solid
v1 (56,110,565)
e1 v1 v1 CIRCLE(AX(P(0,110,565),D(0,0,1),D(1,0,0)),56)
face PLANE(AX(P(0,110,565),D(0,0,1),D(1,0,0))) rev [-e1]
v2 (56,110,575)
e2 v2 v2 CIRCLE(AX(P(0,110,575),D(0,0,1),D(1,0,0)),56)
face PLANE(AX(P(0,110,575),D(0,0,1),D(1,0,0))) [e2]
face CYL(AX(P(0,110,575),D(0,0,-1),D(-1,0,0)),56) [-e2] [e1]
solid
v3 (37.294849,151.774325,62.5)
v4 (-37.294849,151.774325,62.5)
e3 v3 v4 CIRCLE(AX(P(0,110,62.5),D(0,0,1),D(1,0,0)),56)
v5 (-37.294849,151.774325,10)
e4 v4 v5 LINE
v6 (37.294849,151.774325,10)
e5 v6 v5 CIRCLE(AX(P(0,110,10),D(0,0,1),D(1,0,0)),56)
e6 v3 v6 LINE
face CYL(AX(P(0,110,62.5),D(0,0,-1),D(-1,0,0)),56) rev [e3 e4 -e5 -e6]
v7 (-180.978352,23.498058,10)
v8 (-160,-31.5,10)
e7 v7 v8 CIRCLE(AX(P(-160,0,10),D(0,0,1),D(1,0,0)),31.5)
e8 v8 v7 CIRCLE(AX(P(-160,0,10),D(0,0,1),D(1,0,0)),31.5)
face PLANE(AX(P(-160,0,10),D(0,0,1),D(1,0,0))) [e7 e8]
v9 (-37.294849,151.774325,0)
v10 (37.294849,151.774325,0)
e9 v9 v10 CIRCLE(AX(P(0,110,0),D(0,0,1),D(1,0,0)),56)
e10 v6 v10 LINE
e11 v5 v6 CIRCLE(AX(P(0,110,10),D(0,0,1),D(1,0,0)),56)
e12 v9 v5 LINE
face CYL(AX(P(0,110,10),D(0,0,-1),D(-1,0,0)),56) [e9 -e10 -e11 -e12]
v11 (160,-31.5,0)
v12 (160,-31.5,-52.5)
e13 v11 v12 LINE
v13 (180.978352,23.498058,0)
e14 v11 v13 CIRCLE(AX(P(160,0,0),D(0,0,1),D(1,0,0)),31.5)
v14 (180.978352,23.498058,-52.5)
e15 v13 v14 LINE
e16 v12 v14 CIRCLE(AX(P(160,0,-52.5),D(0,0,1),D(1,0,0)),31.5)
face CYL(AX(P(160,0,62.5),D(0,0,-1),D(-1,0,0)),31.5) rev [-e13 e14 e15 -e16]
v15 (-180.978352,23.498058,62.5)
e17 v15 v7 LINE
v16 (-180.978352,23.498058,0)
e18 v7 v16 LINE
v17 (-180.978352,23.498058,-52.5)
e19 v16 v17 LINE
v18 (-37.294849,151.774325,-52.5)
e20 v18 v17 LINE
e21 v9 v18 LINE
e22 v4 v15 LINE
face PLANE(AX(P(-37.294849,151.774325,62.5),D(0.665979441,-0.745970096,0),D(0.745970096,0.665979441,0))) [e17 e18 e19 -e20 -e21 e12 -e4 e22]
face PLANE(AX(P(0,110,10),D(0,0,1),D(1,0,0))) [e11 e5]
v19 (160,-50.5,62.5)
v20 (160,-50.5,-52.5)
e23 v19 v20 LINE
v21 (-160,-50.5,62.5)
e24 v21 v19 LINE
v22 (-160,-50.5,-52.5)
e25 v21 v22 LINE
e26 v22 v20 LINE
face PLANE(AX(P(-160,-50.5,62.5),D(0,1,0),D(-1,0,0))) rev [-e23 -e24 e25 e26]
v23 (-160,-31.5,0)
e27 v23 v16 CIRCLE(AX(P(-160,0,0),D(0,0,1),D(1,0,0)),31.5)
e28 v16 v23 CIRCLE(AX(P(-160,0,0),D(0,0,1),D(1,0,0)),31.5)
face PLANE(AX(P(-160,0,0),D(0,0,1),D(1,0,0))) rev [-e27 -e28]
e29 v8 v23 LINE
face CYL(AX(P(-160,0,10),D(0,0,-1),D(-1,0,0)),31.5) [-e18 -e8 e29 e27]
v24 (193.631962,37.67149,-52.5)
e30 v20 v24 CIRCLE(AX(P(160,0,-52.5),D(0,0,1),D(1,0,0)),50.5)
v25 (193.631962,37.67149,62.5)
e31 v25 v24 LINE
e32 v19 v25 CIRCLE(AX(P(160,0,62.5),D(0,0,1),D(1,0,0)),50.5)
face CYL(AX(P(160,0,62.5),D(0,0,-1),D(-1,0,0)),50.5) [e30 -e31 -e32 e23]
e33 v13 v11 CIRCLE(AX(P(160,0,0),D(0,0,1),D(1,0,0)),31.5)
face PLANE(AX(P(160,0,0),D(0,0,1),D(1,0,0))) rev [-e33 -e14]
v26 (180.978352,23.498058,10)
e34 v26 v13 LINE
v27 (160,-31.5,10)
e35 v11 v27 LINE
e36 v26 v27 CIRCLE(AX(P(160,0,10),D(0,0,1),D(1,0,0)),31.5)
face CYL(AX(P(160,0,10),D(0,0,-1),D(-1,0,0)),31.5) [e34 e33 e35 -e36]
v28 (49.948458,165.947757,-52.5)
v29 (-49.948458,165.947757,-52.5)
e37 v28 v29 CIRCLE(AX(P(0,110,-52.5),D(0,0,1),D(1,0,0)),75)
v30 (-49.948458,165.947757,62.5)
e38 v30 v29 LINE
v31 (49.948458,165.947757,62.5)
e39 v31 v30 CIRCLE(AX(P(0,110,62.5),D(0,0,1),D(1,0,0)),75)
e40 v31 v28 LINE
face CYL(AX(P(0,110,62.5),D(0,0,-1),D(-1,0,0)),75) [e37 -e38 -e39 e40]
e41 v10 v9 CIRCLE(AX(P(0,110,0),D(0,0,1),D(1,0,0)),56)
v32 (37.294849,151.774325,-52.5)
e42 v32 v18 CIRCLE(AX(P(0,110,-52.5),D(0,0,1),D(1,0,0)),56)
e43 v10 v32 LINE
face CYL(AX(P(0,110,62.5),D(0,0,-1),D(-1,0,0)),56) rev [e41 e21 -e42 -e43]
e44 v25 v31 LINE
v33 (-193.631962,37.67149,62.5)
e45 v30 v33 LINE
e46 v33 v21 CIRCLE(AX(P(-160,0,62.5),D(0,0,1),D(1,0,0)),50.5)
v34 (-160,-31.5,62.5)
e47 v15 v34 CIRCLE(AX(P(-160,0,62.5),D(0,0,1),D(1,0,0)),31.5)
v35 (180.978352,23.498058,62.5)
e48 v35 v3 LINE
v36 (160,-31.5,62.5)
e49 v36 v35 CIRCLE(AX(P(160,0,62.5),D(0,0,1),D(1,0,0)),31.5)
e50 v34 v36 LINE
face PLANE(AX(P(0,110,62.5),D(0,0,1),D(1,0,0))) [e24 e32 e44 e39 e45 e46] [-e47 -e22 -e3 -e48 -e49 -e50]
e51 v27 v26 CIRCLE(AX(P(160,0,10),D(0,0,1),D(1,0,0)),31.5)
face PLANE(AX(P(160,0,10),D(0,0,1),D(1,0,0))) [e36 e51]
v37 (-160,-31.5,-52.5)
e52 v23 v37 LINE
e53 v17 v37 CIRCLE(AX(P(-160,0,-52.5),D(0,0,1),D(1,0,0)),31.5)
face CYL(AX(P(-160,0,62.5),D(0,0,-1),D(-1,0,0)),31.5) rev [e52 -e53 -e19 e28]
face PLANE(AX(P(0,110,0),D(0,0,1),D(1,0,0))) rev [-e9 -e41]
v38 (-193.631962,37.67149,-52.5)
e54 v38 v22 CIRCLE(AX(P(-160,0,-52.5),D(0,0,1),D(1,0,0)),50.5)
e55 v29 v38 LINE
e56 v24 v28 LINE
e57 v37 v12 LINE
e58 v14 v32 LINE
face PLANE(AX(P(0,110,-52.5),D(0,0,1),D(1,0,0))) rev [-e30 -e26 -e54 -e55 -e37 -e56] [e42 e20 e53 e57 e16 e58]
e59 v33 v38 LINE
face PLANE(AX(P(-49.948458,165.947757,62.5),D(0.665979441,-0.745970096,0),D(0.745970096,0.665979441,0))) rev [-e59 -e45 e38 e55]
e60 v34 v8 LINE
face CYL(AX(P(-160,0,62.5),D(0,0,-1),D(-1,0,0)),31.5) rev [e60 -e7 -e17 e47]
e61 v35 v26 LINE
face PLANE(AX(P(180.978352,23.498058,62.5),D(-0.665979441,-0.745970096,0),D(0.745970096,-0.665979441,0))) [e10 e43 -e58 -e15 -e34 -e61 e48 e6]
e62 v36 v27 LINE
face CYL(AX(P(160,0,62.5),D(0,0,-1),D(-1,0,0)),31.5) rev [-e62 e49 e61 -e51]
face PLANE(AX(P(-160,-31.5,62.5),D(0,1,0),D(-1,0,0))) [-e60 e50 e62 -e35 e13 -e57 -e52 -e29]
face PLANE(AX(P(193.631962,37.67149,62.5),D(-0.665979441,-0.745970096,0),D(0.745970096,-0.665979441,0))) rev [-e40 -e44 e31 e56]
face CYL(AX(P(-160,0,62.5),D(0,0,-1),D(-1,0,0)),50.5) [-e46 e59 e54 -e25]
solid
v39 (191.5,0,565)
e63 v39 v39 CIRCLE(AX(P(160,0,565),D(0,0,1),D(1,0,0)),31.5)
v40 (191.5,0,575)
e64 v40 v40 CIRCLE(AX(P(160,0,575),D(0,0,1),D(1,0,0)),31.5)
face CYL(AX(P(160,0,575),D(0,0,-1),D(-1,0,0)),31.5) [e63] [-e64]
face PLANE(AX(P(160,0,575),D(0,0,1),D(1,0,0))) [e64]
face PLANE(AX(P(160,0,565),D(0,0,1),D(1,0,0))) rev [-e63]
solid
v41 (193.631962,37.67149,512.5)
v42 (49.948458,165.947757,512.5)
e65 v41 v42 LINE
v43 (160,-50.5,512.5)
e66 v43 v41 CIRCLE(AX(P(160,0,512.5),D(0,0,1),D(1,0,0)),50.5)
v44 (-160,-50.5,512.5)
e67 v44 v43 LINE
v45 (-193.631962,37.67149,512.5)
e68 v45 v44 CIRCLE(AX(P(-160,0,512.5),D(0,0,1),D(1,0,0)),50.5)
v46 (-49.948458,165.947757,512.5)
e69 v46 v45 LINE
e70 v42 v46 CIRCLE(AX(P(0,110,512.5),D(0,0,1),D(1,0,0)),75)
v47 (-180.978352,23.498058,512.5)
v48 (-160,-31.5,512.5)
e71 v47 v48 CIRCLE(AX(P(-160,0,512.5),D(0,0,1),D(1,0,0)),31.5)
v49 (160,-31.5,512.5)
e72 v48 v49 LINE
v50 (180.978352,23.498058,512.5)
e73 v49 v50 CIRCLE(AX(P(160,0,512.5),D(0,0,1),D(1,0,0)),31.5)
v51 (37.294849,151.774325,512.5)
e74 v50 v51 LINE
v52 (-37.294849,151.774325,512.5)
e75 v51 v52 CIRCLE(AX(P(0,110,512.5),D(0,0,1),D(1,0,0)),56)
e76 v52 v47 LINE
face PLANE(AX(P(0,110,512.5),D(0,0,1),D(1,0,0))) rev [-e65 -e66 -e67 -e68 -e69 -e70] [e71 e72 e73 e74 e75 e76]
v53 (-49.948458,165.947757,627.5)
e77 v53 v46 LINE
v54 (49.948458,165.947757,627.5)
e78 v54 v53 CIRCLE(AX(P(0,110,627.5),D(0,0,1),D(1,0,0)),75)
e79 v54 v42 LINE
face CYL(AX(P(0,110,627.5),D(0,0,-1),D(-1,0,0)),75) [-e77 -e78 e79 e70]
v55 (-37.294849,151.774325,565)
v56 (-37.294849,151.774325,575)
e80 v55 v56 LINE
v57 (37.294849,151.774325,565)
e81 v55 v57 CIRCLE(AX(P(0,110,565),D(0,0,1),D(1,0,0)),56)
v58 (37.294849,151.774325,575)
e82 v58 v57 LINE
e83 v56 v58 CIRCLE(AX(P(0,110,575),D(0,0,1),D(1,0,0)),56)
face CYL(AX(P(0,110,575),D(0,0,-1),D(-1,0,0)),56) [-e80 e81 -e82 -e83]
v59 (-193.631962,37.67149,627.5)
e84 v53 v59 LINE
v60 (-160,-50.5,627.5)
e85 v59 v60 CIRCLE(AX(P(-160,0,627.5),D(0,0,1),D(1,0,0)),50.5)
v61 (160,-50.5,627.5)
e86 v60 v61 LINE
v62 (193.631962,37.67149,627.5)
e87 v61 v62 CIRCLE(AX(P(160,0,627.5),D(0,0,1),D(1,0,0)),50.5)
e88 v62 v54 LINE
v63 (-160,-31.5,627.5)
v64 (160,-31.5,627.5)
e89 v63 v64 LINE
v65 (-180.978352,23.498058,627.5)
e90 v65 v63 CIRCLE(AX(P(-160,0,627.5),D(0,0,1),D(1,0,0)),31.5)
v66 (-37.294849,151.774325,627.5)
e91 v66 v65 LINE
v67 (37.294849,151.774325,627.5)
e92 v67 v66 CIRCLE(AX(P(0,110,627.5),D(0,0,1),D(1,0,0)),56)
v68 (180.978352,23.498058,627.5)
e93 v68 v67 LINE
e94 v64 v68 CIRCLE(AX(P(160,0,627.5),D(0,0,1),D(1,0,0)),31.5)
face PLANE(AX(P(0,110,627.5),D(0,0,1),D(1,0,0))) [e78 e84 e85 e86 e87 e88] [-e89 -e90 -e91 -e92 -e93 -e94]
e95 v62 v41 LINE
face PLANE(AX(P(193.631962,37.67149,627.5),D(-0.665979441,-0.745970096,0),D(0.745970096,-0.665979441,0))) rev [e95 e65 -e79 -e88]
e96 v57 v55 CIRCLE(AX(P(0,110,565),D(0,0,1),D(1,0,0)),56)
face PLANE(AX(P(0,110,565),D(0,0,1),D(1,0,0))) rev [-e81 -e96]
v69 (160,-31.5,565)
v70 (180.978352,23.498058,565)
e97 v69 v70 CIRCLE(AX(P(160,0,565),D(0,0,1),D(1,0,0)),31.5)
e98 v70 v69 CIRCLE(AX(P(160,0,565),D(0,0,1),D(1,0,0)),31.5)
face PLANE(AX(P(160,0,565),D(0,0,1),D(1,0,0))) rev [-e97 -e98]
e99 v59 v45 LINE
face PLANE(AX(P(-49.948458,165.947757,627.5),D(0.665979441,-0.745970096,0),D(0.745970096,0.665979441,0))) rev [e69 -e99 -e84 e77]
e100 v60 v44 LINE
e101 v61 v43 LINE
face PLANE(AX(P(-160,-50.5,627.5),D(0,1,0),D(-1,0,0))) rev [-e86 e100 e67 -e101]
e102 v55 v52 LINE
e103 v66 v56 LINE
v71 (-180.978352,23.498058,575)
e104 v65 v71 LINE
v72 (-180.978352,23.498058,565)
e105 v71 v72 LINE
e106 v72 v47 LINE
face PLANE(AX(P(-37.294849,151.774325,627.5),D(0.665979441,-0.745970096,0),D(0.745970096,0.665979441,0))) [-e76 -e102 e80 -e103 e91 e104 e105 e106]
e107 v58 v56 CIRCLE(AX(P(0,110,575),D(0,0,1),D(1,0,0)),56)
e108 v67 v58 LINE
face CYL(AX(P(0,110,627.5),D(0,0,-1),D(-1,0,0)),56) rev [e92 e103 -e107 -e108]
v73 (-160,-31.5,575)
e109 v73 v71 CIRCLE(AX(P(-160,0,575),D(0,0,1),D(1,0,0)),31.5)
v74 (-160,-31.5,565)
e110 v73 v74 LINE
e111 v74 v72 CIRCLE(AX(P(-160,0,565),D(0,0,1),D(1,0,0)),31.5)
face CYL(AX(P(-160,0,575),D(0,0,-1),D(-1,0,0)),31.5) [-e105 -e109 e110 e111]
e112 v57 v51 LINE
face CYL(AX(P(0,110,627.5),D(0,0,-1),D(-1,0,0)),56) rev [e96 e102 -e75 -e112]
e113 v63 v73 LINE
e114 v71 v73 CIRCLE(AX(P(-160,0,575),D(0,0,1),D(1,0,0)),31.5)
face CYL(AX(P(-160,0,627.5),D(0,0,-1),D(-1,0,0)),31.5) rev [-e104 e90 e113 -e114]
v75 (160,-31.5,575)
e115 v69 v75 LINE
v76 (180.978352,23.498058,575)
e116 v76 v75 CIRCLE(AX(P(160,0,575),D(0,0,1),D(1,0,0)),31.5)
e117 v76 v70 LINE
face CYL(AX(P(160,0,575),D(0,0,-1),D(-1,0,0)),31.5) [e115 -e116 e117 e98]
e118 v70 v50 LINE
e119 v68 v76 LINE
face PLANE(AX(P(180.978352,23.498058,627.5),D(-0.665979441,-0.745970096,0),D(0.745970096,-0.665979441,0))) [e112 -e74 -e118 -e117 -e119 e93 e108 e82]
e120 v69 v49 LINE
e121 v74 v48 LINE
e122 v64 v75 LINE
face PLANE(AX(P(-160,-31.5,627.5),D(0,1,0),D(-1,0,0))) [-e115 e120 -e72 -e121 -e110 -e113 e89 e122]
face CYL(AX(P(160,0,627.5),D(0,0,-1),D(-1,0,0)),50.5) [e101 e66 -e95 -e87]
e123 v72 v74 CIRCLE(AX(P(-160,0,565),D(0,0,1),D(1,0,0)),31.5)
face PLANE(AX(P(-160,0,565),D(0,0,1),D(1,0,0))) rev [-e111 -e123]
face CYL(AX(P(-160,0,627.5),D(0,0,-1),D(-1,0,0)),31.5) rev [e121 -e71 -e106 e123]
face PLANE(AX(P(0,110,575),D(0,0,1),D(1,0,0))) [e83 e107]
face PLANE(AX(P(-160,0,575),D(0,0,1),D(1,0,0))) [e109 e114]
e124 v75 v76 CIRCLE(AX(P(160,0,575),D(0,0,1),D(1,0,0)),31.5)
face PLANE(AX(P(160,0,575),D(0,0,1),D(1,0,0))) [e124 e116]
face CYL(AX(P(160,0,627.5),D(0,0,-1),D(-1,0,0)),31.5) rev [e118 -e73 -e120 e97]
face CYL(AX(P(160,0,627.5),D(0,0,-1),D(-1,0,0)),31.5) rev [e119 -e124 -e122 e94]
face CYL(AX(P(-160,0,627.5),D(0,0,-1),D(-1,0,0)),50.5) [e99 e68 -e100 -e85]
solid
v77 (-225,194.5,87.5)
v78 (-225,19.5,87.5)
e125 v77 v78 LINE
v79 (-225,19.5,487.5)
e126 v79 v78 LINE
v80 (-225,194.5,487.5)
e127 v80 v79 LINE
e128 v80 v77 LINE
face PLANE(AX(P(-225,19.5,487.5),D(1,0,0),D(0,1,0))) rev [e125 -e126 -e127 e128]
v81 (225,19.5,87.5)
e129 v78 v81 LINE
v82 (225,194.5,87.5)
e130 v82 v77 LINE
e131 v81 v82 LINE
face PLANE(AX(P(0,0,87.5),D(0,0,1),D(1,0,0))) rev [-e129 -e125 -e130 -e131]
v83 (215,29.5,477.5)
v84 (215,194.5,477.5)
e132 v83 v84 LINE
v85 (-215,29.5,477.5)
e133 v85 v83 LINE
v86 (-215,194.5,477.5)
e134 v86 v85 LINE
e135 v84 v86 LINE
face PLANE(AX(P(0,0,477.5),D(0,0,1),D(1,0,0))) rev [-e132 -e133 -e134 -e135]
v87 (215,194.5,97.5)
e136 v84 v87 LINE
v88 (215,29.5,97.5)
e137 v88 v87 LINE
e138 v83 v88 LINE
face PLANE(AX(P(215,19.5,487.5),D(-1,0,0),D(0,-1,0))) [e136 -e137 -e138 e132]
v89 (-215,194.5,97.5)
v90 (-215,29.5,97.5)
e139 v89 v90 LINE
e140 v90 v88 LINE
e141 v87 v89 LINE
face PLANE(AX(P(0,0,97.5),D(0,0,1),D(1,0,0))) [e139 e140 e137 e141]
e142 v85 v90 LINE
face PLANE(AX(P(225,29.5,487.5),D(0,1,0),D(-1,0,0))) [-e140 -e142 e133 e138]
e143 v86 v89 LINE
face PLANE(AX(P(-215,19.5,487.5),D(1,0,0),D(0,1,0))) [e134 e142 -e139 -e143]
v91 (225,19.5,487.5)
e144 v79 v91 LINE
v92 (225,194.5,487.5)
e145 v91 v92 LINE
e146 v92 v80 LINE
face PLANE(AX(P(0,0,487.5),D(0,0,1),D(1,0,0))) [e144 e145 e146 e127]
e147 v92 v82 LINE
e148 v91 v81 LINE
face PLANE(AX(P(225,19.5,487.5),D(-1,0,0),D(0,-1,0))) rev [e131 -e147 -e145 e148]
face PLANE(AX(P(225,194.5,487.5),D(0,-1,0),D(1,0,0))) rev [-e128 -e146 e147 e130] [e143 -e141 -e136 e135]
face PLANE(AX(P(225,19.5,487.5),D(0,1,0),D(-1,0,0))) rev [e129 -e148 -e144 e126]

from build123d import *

# Parameters (mm, degrees)
SCHIZZO1_R                     = 31.5
ESTRUSIONE_ESTRUSIONE1_DEPTH   = 10
ESTRUSIONE_ESTRUSIONE1_2_DEPTH = 10
SCHIZZO1_R_2                   = 56
ESTRUSIONE_ESTRUSIONE1_3_DEPTH = 10
ESTRUSIONE_SOTTILE1_START      = -62.5
ESTRUSIONE_SOTTILE1_DEPTH      = 115
SCHIZZO3_W                     = 450
SCHIZZO3_H                     = 175
ESTRUSIONE_ESTRUSIONE2_DEPTH   = 400
SVUOTA1_T                      = -10
RIPETIZIONE_START              = 565
RIPETIZIONE_A_L2_OUTLINE_R     = 56
RIPETIZIONE_A_L2_DEPTH         = 10
RIPETIZIONE_A_L2_2_OUTLINE_R   = 31.5
RIPETIZIONE_A_L2_2_DEPTH       = 10
RIPETIZIONE_START_2            = 512.5
RIPETIZIONE_A_L2_3_DEPTH       = 115
RIPETIZIONE_A_L2_4_DEPTH       = 10


# Read off the part's stored shape, not the designer's step: Ripetizione a L2
with BuildPart() as part:
    # Schizzo1 → Estrusione-Estrusione1 (new body)
    with BuildSketch(Plane.XY):
        with Locations((-160, 0)):
            Circle(SCHIZZO1_R)
    extrude(amount=ESTRUSIONE_ESTRUSIONE1_DEPTH)



with BuildPart() as body_2:
    # Schizzo1 → Estrusione-Estrusione1 2 (new body)
    with BuildSketch(Plane.XY):
        with Locations((160, 0)):
            Circle(SCHIZZO1_R)
    extrude(amount=ESTRUSIONE_ESTRUSIONE1_2_DEPTH)


with BuildPart() as body_3:
    # Schizzo1 → Estrusione-Estrusione1 3 (new body)
    with BuildSketch(Plane.XY):
        with Locations((0, 110)):
            Circle(SCHIZZO1_R_2)
    extrude(amount=ESTRUSIONE_ESTRUSIONE1_3_DEPTH)


with BuildPart() as part_1:
    add(part.part)

    add(body_2.part)  # Estrusione-Sottile1 merges body 2

    add(body_3.part)  # Estrusione-Sottile1 merges body 3
    # Schizzo2 → Estrusione-Sottile1 (add)
    with BuildSketch(Plane.XY.offset(10).offset(ESTRUSIONE_SOTTILE1_START)):
        with BuildLine():
            Line((193.631961771, 37.671489849), (49.948458076, 165.947757201))
            ThreePointArc((49.948458076, 165.947757201), (0, 185), (-49.948458076, 165.947757201))
            Line((-49.948458076, 165.947757201), (-193.631961771, 37.671489849))
            ThreePointArc((-193.631961771, 37.671489849), (-207.184002784, -17.997774343), (-160, -50.5))
            Line((-160, -50.5), (160, -50.5))
            ThreePointArc((160, -50.5), (207.184002784, -17.997774343), (193.631961771, 37.671489849))
        make_face()
        with BuildLine():
            Line((180.978352392, 23.498058025), (37.294848697, 151.774325377))
            ThreePointArc((37.294848697, 151.774325377), (0, 166), (-37.294848697, 151.774325377))
            Line((-37.294848697, 151.774325377), (-180.978352392, 23.498058025))
            ThreePointArc((-180.978352392, 23.498058025), (-189.431605697, -11.226334491), (-160, -31.5))
            Line((-160, -31.5), (160, -31.5))
            ThreePointArc((160, -31.5), (189.431605697, -11.226334491), (180.978352392, 23.498058025))
        make_face(mode=Mode.SUBTRACT)
    extrude(amount=ESTRUSIONE_SOTTILE1_DEPTH)


with BuildPart() as body_2_2:
    # Schizzo3 → Estrusione-Estrusione2 (new body)
    with BuildSketch(Plane.XY.offset(87.5)):
        with Locations((0, 107)):
            Rectangle(SCHIZZO3_W, SCHIZZO3_H)
    extrude(amount=ESTRUSIONE_ESTRUSIONE2_DEPTH)

    # Svuota1
    svuota1_openings = [body_2_2.faces().sort_by_distance(p)[0] for p in [
        (0, 194.5, 287.5),
    ]]
    offset(amount=SVUOTA1_T, openings=svuota1_openings, kind=Kind.INTERSECTION)


with BuildPart() as body_3_2:
    # Ripetizione a L2 outline → Ripetizione a L2 (new body)
    with BuildSketch(Plane.XY.offset(RIPETIZIONE_START)):
        with Locations((0, 110)):
            Circle(RIPETIZIONE_A_L2_OUTLINE_R)
    extrude(amount=RIPETIZIONE_A_L2_DEPTH)


with BuildPart() as body_4:
    # Ripetizione a L2 2 outline → Ripetizione a L2 2 (new body)
    with BuildSketch(Plane.XY.offset(RIPETIZIONE_START)):
        with Locations((160, 0)):
            Circle(RIPETIZIONE_A_L2_2_OUTLINE_R)
    extrude(amount=RIPETIZIONE_A_L2_2_DEPTH)


with BuildPart() as body_5:
    # Ripetizione a L2 3 outline → Ripetizione a L2 3 (new body)
    with BuildSketch(Plane.XY.offset(RIPETIZIONE_START_2)):
        with BuildLine():
            ThreePointArc((49.948458076, 165.947757201), (0, 185), (-49.948458076, 165.947757201))
            Line((-49.948458076, 165.947757201), (-193.631961771, 37.671489849))
            ThreePointArc((-193.631961771, 37.671489849), (-207.184002784, -17.997774343), (-160, -50.5))
            Line((-160, -50.5), (160, -50.5))
            ThreePointArc((160, -50.5), (207.184002784, -17.997774343), (193.631961771, 37.671489849))
            Line((193.631961771, 37.671489849), (49.948458076, 165.947757201))
        make_face()
        with BuildLine():
            Line((-180.978352392, 23.498058025), (-37.294848697, 151.774325377))
            ThreePointArc((-37.294848697, 151.774325377), (0, 166), (37.294848697, 151.774325377))
            Line((37.294848697, 151.774325377), (180.978352392, 23.498058025))
            ThreePointArc((180.978352392, 23.498058025), (189.431605697, -11.226334491), (160, -31.5))
            Line((160, -31.5), (-160, -31.5))
            ThreePointArc((-160, -31.5), (-189.431605697, -11.226334491), (-180.978352392, 23.498058025))
        make_face(mode=Mode.SUBTRACT)
    extrude(amount=RIPETIZIONE_A_L2_3_DEPTH)

    # Ripetizione a L2 4 outline → Ripetizione a L2 4 (add)
    with BuildSketch(Plane.XY.offset(RIPETIZIONE_START)):
        with BuildLine():
            ThreePointArc((37.294848697, 151.774325377), (0, 166), (-37.294848697, 151.774325377))
            ThreePointArc((-37.294848697, 151.774325377), (0, 54), (37.294848697, 151.774325377))
        make_face()
        with BuildLine():
            ThreePointArc((-160, -31.5), (-130.568394303, 11.226334492), (-180.978352392, 23.498058025))
            ThreePointArc((-180.978352392, 23.498058025), (-189.431605697, -11.226334491), (-160, -31.5))
        make_face()
        with BuildLine():
            ThreePointArc((160, -31.5), (189.431605697, -11.226334491), (180.978352392, 23.498058025))
            ThreePointArc((180.978352392, 23.498058025), (130.568394303, 11.226334492), (160, -31.5))
        make_face()
    extrude(amount=RIPETIZIONE_A_L2_4_DEPTH)


solid = Compound([part_1.part, body_2_2.part, body_3_2.part, body_4.part, body_5.part])
